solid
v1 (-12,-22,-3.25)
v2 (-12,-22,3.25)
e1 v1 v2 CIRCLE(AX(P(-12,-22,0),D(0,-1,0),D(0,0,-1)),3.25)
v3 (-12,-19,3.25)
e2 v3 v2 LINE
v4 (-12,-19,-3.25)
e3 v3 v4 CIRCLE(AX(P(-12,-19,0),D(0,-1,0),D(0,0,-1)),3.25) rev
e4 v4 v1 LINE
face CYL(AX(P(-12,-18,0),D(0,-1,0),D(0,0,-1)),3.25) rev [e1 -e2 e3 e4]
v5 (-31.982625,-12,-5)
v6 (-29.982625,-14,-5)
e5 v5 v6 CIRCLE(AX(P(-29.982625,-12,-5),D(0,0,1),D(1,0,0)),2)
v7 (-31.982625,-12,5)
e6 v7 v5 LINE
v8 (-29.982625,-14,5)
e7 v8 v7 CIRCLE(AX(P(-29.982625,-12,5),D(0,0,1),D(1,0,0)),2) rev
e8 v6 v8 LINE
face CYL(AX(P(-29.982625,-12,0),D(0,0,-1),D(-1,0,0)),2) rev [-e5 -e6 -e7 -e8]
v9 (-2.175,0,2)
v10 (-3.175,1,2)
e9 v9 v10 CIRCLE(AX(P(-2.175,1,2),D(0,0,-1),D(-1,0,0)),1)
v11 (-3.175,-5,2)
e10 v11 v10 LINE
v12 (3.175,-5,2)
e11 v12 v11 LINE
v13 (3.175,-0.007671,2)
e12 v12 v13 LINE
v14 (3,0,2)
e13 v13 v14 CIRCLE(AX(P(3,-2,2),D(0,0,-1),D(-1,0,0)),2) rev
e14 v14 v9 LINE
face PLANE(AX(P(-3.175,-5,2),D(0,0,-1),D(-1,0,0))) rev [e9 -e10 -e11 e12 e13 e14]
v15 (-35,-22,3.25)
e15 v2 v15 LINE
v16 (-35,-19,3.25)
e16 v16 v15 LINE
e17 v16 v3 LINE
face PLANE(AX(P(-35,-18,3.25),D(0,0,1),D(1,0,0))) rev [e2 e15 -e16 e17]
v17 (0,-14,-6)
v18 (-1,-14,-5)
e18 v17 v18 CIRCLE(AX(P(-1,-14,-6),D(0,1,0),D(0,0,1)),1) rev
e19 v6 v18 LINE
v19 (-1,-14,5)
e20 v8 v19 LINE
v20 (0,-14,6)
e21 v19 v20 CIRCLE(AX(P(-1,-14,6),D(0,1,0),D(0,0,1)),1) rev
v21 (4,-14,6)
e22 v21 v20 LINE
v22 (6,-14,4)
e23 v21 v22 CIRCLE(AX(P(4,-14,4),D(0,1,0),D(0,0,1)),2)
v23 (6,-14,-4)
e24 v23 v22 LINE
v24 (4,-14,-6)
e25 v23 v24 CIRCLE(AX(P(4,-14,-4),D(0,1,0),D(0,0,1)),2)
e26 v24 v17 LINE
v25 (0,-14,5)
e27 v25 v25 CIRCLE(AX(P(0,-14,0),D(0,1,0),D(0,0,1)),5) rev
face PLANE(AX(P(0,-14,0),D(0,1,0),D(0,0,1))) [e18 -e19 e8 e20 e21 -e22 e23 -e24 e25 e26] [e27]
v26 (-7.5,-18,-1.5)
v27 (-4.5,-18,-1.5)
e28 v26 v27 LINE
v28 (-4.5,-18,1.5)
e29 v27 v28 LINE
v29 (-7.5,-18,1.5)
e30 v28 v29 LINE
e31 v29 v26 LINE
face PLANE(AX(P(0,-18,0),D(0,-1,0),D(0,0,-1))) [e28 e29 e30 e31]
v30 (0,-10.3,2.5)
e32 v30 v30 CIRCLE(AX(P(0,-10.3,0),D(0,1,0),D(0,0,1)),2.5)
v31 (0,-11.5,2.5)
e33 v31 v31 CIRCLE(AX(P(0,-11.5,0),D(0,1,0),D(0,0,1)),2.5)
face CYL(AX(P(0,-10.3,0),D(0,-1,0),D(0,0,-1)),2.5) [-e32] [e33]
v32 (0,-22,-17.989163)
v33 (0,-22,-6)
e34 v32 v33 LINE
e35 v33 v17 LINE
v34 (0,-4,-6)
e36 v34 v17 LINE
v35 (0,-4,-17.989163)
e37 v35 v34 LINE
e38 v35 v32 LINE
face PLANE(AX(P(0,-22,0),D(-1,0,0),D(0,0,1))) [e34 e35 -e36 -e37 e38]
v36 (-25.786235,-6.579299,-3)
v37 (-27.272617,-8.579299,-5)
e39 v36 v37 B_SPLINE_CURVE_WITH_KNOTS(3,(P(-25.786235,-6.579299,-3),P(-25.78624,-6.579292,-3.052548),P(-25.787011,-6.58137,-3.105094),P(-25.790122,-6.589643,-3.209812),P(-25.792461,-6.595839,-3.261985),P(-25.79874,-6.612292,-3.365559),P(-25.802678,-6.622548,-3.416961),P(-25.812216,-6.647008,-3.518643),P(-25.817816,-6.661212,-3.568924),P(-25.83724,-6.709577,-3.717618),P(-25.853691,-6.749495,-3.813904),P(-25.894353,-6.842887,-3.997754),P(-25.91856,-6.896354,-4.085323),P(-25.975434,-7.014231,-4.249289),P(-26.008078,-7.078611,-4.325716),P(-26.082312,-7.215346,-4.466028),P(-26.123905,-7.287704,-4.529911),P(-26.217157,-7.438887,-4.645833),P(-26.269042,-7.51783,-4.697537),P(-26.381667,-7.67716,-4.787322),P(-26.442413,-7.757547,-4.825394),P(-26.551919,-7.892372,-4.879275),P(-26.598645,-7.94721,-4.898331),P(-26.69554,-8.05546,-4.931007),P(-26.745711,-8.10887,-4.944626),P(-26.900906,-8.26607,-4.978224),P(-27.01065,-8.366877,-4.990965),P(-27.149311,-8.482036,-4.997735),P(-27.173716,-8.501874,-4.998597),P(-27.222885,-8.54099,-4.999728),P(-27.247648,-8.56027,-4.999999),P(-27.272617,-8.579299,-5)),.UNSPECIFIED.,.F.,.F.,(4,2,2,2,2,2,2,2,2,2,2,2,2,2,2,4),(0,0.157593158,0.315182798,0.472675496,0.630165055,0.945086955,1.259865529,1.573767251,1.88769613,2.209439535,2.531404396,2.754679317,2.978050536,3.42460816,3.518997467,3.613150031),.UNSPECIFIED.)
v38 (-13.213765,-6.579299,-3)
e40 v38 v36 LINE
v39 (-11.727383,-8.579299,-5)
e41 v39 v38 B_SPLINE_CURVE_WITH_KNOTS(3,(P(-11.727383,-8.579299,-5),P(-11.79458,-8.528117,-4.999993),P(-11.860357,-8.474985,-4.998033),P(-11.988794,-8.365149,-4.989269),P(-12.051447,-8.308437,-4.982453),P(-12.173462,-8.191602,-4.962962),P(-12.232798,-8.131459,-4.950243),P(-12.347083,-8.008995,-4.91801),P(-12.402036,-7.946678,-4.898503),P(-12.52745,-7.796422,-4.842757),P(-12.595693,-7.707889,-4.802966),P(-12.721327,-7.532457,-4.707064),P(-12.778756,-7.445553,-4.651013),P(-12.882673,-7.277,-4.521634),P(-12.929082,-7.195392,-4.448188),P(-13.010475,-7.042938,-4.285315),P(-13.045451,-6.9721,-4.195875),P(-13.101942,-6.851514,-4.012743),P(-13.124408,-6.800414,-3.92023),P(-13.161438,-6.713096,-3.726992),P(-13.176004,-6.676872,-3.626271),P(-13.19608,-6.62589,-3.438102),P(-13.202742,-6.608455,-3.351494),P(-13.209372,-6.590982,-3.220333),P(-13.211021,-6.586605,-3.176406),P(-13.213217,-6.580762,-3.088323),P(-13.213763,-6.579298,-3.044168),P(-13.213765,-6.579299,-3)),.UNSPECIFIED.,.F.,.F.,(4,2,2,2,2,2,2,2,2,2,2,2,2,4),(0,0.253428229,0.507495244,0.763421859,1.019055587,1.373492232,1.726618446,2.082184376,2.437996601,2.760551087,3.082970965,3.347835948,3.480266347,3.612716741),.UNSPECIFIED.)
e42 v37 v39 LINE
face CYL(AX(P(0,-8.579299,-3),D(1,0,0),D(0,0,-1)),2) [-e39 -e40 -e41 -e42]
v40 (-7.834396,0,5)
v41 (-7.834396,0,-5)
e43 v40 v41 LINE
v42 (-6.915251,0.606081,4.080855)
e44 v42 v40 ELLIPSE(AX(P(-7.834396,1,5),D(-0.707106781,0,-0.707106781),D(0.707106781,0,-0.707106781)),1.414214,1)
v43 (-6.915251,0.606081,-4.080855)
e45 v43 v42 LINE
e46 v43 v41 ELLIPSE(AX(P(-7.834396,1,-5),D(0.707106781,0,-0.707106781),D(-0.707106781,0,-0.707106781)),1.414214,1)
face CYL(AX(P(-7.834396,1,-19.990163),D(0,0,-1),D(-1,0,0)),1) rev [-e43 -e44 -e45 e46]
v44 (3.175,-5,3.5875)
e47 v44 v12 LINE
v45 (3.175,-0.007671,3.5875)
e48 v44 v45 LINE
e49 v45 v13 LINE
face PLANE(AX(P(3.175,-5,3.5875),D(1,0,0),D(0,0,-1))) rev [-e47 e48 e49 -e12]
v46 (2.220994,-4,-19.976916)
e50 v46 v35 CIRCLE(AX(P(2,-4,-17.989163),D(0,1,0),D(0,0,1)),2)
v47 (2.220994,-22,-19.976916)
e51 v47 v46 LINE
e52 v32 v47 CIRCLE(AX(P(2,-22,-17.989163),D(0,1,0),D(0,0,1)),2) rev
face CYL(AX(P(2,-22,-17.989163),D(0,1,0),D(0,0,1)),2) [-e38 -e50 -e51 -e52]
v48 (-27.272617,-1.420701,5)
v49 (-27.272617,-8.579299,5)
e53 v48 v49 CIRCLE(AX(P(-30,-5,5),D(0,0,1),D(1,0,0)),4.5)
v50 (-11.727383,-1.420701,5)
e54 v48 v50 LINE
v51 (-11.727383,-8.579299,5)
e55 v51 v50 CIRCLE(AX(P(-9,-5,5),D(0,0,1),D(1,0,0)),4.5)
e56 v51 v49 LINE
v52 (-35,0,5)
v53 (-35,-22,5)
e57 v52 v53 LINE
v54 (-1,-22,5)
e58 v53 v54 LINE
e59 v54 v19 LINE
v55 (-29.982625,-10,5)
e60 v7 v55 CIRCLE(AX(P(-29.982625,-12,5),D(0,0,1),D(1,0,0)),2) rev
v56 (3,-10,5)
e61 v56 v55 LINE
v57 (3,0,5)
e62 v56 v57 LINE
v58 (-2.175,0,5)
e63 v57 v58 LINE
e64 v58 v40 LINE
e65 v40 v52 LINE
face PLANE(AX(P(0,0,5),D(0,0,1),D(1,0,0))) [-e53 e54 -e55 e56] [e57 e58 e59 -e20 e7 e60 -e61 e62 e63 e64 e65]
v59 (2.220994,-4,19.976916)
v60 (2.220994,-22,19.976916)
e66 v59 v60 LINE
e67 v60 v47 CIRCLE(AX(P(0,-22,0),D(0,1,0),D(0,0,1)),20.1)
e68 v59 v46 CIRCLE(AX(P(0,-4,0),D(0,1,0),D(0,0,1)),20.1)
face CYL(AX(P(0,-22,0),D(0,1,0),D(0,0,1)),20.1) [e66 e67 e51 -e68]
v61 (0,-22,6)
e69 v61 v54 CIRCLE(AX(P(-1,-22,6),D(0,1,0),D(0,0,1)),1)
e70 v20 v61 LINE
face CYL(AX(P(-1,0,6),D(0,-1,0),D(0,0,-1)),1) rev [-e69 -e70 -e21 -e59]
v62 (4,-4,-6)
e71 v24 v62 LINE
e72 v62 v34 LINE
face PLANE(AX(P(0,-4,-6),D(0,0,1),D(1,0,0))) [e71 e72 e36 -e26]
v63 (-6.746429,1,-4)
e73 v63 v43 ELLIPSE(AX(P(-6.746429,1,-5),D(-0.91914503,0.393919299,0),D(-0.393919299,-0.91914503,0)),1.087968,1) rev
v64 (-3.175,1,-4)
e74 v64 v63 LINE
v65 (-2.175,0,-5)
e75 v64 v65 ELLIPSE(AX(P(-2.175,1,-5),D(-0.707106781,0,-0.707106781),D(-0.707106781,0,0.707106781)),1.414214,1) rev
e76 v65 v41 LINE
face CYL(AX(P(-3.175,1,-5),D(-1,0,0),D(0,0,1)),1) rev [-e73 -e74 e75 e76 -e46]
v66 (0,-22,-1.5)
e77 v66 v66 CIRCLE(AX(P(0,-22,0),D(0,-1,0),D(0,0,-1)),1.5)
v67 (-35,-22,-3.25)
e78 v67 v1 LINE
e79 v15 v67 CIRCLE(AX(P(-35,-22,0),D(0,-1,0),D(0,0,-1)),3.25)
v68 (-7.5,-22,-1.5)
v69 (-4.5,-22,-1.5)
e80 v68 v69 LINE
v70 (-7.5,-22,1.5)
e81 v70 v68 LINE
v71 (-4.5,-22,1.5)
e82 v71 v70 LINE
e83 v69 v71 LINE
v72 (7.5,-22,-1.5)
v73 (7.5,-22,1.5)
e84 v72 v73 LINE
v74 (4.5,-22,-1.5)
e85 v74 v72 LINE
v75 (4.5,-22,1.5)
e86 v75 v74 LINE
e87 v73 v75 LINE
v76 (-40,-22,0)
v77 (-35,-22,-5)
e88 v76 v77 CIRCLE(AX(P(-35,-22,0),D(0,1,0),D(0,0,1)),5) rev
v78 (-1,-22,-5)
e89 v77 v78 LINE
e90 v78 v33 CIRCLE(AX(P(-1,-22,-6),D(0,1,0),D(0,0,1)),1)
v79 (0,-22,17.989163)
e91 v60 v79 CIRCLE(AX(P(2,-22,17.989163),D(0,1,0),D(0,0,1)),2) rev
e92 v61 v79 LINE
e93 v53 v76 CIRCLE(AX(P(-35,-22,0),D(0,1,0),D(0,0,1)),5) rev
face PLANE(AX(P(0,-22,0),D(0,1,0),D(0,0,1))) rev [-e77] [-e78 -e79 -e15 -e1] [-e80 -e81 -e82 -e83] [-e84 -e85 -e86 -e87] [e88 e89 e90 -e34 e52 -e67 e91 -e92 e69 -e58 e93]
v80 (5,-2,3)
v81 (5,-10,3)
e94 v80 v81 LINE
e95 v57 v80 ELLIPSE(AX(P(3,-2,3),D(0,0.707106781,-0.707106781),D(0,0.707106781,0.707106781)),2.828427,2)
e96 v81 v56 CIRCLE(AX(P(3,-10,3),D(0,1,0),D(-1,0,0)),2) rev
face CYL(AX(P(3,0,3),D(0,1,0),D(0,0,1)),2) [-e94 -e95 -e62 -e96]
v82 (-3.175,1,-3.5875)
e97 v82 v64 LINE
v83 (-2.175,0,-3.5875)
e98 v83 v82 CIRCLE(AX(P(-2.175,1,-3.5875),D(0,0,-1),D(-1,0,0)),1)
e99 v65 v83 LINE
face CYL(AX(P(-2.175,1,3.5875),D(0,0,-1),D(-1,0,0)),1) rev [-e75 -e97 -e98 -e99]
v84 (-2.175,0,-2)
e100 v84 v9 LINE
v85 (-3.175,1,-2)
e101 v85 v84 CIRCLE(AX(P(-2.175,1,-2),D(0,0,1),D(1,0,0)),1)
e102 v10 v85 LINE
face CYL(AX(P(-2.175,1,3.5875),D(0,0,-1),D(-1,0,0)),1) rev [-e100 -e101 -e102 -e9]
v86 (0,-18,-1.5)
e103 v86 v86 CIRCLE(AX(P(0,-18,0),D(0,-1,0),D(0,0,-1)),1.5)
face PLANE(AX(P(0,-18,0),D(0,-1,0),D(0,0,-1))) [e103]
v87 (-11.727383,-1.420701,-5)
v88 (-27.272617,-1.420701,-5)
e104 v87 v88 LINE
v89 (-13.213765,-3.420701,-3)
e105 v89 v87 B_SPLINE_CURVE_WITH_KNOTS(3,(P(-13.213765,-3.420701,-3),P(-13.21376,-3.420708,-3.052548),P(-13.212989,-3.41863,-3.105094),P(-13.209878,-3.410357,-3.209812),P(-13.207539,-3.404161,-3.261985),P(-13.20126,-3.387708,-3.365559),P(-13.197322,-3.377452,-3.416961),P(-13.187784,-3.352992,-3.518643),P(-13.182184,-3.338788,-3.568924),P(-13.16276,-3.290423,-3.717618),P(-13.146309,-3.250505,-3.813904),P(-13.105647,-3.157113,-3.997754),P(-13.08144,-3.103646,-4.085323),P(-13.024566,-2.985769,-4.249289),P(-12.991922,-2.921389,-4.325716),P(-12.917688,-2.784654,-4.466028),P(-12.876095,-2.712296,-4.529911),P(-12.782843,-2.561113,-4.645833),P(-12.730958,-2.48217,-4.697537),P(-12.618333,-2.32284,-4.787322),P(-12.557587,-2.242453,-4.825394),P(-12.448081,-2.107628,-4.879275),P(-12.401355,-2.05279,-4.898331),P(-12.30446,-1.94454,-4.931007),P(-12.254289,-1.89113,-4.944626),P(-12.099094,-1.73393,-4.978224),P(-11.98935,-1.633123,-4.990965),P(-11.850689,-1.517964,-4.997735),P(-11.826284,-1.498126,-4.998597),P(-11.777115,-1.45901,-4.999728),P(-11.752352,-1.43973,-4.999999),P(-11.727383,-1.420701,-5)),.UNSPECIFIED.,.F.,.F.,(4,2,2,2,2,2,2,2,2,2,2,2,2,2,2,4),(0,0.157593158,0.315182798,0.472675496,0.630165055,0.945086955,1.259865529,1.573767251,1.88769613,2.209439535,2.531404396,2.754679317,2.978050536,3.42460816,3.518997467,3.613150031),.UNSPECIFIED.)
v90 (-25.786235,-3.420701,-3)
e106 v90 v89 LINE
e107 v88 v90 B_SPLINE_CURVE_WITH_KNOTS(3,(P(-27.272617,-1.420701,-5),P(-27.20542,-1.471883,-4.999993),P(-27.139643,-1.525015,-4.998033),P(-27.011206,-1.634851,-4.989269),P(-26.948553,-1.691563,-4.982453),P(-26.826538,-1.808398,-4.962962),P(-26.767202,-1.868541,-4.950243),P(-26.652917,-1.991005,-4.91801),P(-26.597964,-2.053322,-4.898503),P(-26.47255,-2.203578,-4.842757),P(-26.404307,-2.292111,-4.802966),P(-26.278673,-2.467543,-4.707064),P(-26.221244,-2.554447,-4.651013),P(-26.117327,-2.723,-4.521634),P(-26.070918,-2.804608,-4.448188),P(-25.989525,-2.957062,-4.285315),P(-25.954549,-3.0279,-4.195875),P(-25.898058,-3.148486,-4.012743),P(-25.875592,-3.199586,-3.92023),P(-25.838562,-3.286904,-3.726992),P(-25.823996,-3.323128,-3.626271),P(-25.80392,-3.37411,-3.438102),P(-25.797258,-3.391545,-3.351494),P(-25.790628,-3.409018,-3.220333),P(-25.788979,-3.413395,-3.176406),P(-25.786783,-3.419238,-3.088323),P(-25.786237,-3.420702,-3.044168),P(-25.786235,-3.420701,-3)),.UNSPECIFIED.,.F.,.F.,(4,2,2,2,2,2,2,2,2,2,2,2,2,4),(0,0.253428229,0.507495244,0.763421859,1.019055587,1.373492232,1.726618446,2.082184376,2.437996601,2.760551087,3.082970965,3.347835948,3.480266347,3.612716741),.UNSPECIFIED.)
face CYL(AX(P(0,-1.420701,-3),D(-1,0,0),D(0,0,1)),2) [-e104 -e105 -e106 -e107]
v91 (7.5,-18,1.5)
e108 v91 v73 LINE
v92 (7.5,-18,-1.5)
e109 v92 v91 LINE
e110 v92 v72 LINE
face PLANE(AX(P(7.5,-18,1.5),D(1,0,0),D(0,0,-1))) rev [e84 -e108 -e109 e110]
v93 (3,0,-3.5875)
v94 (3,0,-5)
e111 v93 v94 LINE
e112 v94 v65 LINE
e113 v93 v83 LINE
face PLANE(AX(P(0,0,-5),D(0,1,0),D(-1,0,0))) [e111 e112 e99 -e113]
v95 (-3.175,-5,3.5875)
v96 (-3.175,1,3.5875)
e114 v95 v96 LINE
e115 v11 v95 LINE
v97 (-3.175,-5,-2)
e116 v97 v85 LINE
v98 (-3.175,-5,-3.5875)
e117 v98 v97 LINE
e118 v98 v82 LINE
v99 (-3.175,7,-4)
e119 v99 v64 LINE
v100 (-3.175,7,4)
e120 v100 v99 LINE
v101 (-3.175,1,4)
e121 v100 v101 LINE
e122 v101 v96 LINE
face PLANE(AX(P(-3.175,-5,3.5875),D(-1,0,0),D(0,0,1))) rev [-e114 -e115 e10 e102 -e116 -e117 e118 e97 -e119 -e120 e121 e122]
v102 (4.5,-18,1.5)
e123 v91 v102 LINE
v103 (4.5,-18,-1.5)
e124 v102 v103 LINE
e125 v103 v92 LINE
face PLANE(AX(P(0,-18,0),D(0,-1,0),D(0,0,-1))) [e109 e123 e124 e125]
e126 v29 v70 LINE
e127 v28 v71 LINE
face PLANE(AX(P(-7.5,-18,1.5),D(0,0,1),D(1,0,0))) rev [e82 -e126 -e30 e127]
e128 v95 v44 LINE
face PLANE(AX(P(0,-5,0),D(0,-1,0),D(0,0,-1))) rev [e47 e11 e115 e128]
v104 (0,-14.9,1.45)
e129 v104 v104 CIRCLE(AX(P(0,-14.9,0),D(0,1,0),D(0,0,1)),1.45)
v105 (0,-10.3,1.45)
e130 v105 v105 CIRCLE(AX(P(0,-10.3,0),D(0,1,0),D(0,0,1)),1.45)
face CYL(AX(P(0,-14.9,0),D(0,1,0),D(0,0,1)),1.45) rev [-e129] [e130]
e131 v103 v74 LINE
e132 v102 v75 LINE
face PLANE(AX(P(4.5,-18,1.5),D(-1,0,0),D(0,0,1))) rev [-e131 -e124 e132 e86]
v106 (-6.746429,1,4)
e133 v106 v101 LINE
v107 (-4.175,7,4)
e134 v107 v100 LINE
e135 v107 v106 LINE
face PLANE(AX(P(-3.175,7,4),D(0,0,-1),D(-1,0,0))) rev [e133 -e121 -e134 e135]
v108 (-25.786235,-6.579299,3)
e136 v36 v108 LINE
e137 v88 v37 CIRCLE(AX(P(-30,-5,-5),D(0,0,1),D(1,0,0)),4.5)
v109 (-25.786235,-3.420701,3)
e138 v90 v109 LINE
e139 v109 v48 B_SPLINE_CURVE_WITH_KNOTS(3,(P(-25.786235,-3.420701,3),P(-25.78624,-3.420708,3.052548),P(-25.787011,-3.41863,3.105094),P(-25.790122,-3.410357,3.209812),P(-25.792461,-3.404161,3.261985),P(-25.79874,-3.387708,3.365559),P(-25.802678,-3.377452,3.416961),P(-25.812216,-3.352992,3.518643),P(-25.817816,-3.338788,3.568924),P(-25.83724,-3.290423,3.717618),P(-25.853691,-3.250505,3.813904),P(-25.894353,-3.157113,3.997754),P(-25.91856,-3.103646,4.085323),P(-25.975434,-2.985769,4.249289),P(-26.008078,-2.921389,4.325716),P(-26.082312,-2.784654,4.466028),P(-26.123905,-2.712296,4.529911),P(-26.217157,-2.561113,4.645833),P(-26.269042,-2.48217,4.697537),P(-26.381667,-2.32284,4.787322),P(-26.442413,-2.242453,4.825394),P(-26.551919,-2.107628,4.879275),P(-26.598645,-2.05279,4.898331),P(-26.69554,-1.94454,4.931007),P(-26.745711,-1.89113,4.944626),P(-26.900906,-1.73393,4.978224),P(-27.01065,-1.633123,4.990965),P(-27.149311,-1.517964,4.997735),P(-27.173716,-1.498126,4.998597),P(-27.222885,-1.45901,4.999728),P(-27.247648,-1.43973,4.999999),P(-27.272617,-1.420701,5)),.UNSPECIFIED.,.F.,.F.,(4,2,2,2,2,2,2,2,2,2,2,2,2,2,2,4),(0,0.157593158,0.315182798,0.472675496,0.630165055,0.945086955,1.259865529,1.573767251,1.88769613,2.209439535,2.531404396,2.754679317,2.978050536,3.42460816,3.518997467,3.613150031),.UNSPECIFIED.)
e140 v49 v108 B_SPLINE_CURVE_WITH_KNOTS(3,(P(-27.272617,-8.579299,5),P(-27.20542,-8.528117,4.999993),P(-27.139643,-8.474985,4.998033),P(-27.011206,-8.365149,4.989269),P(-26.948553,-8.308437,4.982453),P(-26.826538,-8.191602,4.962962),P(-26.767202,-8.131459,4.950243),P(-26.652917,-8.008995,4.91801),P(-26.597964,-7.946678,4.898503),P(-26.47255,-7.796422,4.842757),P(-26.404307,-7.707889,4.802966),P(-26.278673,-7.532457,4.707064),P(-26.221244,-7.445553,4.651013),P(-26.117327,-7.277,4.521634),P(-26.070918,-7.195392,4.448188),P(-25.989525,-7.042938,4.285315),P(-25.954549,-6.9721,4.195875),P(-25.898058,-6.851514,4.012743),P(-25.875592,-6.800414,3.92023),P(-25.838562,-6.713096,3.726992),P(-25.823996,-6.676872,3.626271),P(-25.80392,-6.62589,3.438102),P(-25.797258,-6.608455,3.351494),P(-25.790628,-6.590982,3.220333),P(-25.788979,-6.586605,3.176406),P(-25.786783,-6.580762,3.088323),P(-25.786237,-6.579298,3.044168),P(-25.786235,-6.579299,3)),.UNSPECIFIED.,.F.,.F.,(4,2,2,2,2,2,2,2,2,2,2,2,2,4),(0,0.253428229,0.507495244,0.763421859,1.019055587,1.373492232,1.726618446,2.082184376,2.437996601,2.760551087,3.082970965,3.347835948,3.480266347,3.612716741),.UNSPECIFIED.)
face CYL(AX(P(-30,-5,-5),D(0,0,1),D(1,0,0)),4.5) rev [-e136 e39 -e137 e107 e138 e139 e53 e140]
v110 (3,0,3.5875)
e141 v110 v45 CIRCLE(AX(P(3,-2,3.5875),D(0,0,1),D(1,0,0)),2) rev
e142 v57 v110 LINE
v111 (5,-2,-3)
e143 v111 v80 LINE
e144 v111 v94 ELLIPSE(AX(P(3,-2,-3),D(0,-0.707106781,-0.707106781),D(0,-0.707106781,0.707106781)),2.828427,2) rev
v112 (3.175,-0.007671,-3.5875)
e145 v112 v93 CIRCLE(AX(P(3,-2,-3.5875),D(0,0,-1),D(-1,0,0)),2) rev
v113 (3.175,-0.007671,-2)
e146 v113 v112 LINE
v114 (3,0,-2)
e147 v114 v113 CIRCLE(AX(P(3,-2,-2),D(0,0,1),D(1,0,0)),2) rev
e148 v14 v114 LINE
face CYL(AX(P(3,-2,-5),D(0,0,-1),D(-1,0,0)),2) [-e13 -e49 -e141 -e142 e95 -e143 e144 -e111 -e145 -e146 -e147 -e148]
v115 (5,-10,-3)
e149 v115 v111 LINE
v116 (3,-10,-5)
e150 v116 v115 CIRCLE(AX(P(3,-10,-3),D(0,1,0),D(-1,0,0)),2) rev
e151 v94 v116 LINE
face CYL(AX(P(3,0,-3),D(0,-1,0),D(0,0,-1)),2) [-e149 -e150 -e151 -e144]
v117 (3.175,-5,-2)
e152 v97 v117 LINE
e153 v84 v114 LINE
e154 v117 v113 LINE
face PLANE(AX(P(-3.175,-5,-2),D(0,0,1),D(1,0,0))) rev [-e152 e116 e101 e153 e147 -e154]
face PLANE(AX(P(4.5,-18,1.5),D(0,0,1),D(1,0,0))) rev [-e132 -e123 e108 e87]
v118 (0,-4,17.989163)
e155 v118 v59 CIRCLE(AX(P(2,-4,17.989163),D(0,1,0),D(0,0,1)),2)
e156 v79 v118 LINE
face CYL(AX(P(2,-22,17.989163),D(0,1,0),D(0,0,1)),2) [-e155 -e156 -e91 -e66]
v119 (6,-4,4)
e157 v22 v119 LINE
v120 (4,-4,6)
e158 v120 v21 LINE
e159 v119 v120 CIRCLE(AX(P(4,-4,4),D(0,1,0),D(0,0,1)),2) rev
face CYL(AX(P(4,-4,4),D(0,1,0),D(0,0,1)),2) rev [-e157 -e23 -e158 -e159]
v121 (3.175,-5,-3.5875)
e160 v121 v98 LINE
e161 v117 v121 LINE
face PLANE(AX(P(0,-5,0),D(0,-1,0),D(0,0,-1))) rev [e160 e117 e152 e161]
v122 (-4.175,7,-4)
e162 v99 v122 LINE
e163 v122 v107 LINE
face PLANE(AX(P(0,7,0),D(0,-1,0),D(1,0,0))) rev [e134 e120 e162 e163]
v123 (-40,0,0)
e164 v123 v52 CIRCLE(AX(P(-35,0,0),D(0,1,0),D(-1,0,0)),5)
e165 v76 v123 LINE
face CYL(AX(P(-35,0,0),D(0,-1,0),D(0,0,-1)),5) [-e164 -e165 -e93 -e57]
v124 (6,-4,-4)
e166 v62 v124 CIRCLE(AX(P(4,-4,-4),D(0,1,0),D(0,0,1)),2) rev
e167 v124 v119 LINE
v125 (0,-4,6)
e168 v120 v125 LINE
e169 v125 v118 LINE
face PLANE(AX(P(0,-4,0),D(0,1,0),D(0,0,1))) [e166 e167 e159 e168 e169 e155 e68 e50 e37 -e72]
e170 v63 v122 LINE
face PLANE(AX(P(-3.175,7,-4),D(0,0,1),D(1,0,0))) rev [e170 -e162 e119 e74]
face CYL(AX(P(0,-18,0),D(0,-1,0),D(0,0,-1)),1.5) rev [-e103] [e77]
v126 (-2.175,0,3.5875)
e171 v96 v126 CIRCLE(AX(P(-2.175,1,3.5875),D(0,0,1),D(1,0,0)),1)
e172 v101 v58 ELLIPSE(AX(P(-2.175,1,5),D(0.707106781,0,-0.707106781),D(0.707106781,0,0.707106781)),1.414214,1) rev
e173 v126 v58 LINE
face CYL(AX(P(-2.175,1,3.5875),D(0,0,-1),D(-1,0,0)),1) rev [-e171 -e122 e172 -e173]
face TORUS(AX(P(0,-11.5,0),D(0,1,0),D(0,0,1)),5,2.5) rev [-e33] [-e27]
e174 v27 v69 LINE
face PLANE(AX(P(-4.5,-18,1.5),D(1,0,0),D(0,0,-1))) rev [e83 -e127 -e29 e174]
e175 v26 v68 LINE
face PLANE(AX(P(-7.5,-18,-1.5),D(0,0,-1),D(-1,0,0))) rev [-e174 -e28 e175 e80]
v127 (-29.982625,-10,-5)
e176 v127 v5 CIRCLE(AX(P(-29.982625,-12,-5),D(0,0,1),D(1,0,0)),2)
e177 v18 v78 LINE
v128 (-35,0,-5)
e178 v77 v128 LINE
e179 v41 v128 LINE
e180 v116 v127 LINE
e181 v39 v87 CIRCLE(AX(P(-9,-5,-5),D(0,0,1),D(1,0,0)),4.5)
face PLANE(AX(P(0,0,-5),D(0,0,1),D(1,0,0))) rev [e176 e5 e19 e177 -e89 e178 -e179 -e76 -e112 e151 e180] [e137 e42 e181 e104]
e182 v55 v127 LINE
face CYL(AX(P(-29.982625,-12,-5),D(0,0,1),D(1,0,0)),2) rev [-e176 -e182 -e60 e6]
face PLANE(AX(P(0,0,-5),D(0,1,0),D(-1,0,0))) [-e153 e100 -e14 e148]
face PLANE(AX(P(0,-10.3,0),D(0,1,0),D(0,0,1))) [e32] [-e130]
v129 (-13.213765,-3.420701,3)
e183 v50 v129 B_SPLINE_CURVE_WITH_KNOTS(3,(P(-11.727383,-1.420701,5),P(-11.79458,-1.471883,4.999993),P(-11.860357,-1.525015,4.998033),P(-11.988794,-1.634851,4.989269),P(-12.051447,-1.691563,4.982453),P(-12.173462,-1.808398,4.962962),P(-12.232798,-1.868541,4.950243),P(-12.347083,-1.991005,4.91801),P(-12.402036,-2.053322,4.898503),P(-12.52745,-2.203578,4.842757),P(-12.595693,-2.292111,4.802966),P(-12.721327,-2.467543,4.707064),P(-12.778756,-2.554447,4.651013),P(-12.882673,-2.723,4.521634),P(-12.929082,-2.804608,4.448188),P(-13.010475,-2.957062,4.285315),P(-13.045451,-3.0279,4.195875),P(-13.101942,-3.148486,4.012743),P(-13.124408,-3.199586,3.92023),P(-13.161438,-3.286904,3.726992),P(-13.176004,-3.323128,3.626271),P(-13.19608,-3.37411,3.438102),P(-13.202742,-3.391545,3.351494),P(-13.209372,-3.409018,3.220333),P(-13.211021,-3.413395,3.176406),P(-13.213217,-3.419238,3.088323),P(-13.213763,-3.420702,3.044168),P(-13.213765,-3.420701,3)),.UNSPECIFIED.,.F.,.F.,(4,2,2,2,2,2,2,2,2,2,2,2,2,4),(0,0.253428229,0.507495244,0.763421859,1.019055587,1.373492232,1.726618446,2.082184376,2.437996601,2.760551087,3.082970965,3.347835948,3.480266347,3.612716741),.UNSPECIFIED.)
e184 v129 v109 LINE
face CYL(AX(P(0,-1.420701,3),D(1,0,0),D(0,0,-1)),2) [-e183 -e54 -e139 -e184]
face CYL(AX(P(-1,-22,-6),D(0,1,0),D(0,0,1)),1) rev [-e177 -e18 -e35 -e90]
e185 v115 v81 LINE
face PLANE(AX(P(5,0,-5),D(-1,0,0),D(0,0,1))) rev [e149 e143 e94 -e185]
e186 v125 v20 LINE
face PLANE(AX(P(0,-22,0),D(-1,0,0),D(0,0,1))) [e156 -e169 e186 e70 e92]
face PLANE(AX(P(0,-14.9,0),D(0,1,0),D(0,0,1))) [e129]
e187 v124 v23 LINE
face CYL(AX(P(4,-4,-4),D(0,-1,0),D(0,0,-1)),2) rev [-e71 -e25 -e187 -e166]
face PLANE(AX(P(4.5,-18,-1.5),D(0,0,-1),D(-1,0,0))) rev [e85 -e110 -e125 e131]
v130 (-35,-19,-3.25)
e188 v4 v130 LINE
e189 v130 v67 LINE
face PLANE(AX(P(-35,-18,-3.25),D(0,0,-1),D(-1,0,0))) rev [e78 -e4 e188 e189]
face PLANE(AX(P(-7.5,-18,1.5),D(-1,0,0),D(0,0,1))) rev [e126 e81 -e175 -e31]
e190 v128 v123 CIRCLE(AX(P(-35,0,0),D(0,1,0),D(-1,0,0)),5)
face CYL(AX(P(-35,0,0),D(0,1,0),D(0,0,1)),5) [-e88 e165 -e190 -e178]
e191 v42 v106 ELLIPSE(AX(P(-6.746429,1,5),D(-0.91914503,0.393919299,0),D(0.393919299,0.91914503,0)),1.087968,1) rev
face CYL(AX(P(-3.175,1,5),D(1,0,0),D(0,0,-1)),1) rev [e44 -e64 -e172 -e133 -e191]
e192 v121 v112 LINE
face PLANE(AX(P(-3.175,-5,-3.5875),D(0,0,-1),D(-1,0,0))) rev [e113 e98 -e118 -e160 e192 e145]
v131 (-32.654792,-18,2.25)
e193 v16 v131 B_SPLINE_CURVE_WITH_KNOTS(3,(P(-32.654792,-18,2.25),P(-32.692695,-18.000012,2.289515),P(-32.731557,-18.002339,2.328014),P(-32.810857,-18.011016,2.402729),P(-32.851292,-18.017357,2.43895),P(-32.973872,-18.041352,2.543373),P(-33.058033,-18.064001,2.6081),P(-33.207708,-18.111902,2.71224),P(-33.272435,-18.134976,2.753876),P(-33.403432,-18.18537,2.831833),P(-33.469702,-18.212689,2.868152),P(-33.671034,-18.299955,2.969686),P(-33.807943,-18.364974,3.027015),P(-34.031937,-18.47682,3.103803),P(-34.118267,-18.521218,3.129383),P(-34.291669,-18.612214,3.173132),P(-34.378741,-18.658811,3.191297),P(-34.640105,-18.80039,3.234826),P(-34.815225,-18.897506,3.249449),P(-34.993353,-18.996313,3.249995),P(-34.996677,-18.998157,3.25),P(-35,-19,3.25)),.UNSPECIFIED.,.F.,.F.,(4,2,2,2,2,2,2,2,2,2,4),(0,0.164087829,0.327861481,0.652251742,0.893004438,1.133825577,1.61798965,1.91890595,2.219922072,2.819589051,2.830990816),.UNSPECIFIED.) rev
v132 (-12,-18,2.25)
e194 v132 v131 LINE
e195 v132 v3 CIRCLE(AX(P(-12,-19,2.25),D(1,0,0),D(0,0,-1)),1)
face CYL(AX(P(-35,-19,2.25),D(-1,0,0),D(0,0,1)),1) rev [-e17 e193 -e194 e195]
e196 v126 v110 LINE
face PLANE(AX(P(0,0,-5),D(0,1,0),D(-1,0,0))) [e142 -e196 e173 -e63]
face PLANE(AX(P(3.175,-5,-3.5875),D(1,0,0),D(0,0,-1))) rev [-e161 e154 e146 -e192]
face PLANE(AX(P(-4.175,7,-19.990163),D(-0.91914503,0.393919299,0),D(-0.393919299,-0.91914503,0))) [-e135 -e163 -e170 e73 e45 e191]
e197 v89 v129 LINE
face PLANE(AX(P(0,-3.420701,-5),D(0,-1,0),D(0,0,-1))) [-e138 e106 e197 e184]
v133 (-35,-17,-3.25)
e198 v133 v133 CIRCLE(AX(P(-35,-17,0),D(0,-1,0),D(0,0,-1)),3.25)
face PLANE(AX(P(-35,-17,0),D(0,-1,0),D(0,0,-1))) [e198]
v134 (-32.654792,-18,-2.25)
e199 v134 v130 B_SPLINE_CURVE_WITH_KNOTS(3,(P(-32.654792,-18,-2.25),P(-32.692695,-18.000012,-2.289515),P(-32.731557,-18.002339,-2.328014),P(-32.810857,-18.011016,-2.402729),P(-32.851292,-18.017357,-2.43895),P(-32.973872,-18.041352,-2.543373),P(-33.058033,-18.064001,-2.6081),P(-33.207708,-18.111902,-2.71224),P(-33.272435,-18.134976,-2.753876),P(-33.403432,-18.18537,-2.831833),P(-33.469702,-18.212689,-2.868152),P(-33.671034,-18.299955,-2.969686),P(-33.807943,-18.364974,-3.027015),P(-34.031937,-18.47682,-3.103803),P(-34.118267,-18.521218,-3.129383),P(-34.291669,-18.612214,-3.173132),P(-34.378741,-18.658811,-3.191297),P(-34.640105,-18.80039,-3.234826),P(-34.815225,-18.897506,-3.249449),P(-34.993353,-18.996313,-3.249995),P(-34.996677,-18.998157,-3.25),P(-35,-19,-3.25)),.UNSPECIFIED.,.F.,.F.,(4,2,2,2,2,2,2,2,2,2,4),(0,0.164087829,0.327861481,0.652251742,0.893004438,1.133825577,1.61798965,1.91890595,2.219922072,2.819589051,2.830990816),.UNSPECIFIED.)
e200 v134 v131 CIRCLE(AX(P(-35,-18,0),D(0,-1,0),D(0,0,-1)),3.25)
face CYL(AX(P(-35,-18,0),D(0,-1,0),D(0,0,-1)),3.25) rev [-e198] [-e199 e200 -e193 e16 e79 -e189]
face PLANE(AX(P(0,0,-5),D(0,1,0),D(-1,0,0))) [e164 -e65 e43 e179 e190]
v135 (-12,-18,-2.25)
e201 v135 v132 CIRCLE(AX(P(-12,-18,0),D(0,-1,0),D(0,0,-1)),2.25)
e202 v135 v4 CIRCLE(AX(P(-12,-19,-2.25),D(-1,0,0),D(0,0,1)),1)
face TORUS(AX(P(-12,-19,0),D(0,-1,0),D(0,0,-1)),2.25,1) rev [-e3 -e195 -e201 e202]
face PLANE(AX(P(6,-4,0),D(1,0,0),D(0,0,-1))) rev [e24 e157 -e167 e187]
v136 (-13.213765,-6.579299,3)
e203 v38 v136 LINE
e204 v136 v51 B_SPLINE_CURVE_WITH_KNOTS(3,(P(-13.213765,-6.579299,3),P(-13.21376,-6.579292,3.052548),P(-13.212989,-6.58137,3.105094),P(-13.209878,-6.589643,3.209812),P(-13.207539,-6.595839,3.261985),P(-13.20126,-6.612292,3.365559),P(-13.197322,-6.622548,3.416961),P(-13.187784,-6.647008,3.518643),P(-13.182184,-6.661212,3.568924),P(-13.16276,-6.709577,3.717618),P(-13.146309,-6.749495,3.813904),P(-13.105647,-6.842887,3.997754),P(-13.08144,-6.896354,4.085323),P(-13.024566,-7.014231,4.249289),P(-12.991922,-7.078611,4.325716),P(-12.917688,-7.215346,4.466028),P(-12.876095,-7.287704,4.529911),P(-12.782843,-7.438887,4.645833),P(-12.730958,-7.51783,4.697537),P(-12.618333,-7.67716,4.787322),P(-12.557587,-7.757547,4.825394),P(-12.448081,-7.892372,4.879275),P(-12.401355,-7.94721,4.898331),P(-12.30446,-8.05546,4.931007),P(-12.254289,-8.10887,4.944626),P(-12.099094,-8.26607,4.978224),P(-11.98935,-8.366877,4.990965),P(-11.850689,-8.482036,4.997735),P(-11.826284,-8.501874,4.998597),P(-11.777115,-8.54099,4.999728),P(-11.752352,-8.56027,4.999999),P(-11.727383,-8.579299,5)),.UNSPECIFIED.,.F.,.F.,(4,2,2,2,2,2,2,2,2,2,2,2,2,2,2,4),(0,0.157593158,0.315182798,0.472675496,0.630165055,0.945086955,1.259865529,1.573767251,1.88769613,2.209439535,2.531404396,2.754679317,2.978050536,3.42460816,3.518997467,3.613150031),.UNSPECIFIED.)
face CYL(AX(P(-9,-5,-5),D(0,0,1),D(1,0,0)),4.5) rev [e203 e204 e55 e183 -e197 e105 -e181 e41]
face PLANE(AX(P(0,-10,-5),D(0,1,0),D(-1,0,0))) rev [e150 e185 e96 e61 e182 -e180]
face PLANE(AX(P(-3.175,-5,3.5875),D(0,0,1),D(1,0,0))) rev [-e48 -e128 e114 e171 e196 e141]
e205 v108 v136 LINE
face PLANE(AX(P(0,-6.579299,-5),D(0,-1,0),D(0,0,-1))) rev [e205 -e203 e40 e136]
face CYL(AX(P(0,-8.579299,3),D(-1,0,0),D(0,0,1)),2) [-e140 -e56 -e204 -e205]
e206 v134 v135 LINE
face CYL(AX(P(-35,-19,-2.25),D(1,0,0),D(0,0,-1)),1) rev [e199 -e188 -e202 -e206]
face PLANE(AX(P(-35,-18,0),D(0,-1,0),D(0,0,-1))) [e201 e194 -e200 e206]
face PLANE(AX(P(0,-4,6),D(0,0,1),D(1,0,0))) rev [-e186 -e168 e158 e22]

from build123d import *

# Parameters (mm, degrees)
BOSS_EXTRUDE1_DEPTH      = 5
BOSS_EXTRUDE1_DEPTH_BACK = 5
SKETCH2_W                = 6.35
SKETCH2_H                = 1.5875
CUT_EXTRUDE1_DEPTH       = 5
BOSS_EXTRUDE2_START      = -14
SKETCH3_W                = 5.881583951
SKETCH3_H                = 10
BOSS_EXTRUDE2_DEPTH      = 8
BOSS_EXTRUDE3_START      = 10
BOSS_EXTRUDE3_DEPTH      = 10
FILLET2_R                = 5
FILLET6_R                = 2
FILLET3_R                = 2
SKETCH5_R                = 1.5
SKETCH5_W                = 3
SKETCH5_H                = 3
CUT_EXTRUDE2_DEPTH       = 4
FILLET4_R                = 1
SKETCH6_R                = 3.25
CUT_EXTRUDE3_DEPTH       = 5
BOSS_EXTRUDE4_START      = -14
SKETCH7_R                = 2.5
BOSS_EXTRUDE4_DEPTH      = 3.7
SKETCH9_R                = 1.45
CUT_EXTRUDE4_DEPTH       = 4.6
FILLET5_R                = 2.5
SKETCH10_W               = 4
SKETCH10_H               = 8
BOSS_EXTRUDE5_DEPTH      = 7
CUT_EXTRUDE5_REACH       = 53.57
FILLET7_R                = 1


# Some blends are built 0.0001 mm under size
with BuildPart() as part:
    # Sketch1 → Boss-Extrude1 (new, two sides: drawn at the far end of the back side and taken through both)
    with BuildSketch(Plane.XY.offset(-BOSS_EXTRUDE1_DEPTH_BACK)):
        Polygon((5, -10), (5, 0), (0, 0), (-5, 0), (-35, 0), (-40, 0), (-40, -14), (-31.982625312, -14), (-31.982625312, -10), (-5, -10), align=None)
        with BuildLine():
            ThreePointArc((-25.78623506, -6.579298906), (-34.5, -5), (-25.78623506, -3.420701094))
            Line((-25.78623506, -3.420701094), (-13.21376494, -3.420701094))
            ThreePointArc((-13.21376494, -3.420701094), (-8.197485897, -0.572136959), (-4.5, -5))
            ThreePointArc((-4.5, -5), (-8.197485897, -9.427863041), (-13.21376494, -6.579298906))
            Line((-13.21376494, -6.579298906), (-25.78623506, -6.579298906))
        make_face(mode=Mode.SUBTRACT)
    extrude(amount=BOSS_EXTRUDE1_DEPTH + BOSS_EXTRUDE1_DEPTH_BACK)

    # Sketch2 → Cut-Extrude1 (cut)
    with BuildSketch(Plane(origin=(0, 0, 0), x_dir=(1, 0, 0), z_dir=(0, 1, 0))):
        with Locations((0, -2.79375)):
            Rectangle(SKETCH2_W, SKETCH2_H)
        with Locations((0, 2.79375)):
            Rectangle(SKETCH2_W, SKETCH2_H)
    extrude(amount=-CUT_EXTRUDE1_DEPTH, mode=Mode.SUBTRACT)

    # Sketch3 → Boss-Extrude2 (add)
    with BuildSketch(Plane(origin=(0, 0, 0), x_dir=(1, 0, 0), z_dir=(0, 1, 0)).offset(BOSS_EXTRUDE2_START)):
        with BuildLine():
            Line((0, 20.1), (0, 5))
            Line((0, 5), (5.881583951, 5))
            Line((5.881583951, 5), (5.881583951, -5))
            Line((5.881583951, -5), (0, -5))
            Line((0, -5), (0, -20.1))
            ThreePointArc((0, -20.1), (14.212846302, -14.212846302), (20.1, 0))
            ThreePointArc((20.1, 0), (14.212846302, 14.212846302), (0, 20.1))
        make_face()
        with Locations((2.940791976, 0)):
            Rectangle(SKETCH3_W, SKETCH3_H)
        with BuildLine():
            Line((0, 5), (-19.468179165, 5))
            ThreePointArc((-19.468179165, 5), (-20.1, 0), (-19.468179165, -5))
            Line((-19.468179165, -5), (0, -5))
            Line((0, -5), (0, 5))
        make_face()
        with BuildLine():
            Line((-19.468179165, 5), (-40, 5))
            Line((-40, 5), (-40, -5))
            Line((-40, -5), (-19.468179165, -5))
            ThreePointArc((-19.468179165, -5), (-20.1, 0), (-19.468179165, 5))
        make_face()
    extrude(amount=-BOSS_EXTRUDE2_DEPTH)

    # Sketch4 → Boss-Extrude3 (add)
    with BuildSketch(Plane(origin=(0, -14, 0), x_dir=(1, 0, 0), z_dir=(0, 1, 0)).offset(BOSS_EXTRUDE3_START)):
        with BuildLine():
            ThreePointArc((20.1, 0), (14.212846302, 14.212846302), (0, 20.1))
            Line((0, 20.1), (0, 6))
            Line((0, 6), (6, 6))
            Line((6, 6), (6, -6))
            Line((6, -6), (0, -6))
            Line((0, -6), (0, -20.1))
            ThreePointArc((0, -20.1), (14.212846302, -14.212846302), (20.1, 0))
        make_face()
    extrude(amount=-BOSS_EXTRUDE3_DEPTH)

    # Fillet2
    fillet2_edges = [part.edges().sort_by_distance(p)[0] for p in [
        (-40, -11, -5),
        (-40, -11, 5),
    ]]
    fillet(fillet2_edges, radius=FILLET2_R - 0.0001)  # a hair under: the kernel refuses the full size

    # Fillet6
    # the kernel refuses this fillet: 2 mm, written as the material it adds along each edge
    with BuildSketch(Plane(origin=(6, -4, -6), x_dir=(-1, 0, 0), z_dir=(0, -1, 0))) as fillet6_piece_1:
        with BuildLine():
            CenterArc((FILLET6_R, -FILLET6_R), FILLET6_R, 90, 90)
            Line((0, -FILLET6_R), (0, 0))
            Line((0, 0), (FILLET6_R, 0))
        make_face()
    extrude(amount=15)
    with BuildSketch(Plane(origin=(6, -4, 6), x_dir=(-1, 0, 0), z_dir=(0, -1, 0))) as fillet6_piece_2:
        with BuildLine():
            CenterArc((FILLET6_R, FILLET6_R), FILLET6_R, 180, 90)
            Line((0, FILLET6_R), (0, 0))
            Line((0, 0), (FILLET6_R, 0))
        make_face()
    extrude(amount=15)
    # the kernel refuses this fillet: 2 mm, written as the material it takes off along each edge
    with BuildSketch(Plane(origin=(5, -15, -5), x_dir=(0, 0, 1), z_dir=(0, 1, 0))) as fillet6_2_piece_1_section:
        with BuildLine():
            CenterArc((FILLET6_R, -FILLET6_R), FILLET6_R, 90, 90)
            Line((0, -FILLET6_R), (0, 0))
            Line((0, 0), (FILLET6_R, 0))
        make_face()
    fillet6_2_piece_1 = extrude(amount=20, mode=Mode.PRIVATE)
    fillet6_2_piece_1 = split(fillet6_2_piece_1, bisect_by=Plane(origin=(4.553264122, -14, -4.553264122), z_dir=(0, 1, 0)), keep=Keep.TOP, mode=Mode.PRIVATE)
    add(fillet6_2_piece_1, mode=Mode.SUBTRACT)
    with BuildSketch(Plane(origin=(5, -15, 5), x_dir=(-1, 0, 0), z_dir=(0, 1, 0))) as fillet6_2_piece_2_section:
        with BuildLine():
            CenterArc((FILLET6_R, -FILLET6_R), FILLET6_R, 90, 90)
            Line((0, -FILLET6_R), (0, 0))
            Line((0, 0), (FILLET6_R, 0))
        make_face()
    fillet6_2_piece_2 = extrude(amount=20, mode=Mode.PRIVATE)
    fillet6_2_piece_2 = split(fillet6_2_piece_2, bisect_by=Plane(origin=(4.553264122, -14, 4.553264122), z_dir=(0, 1, 0)), keep=Keep.TOP, mode=Mode.PRIVATE)
    add(fillet6_2_piece_2, mode=Mode.SUBTRACT)
    with BuildSketch(Plane(origin=(5, 0, -10), x_dir=(-1, 0, 0), z_dir=(0, 0, 1))) as fillet6_2_piece_3:
        with BuildLine():
            CenterArc((FILLET6_R, FILLET6_R), FILLET6_R, 180, 90)
            Line((0, FILLET6_R), (0, 0))
            Line((0, 0), (FILLET6_R, 0))
        make_face()
    extrude(amount=20, mode=Mode.SUBTRACT)

    # Fillet3
    fillet3_edges = [part.edges().sort_by_distance(p)[0] for p in [
        (-19.5, -3.420701094, -5),
        (-19.5, -6.579298906, -5),
        (-19.5, -6.579298906, 5),
        (-19.5, -3.420701094, 5),
        (-31.982625312, -10, 0),
        (-31.982625312, -14, 0),
        (0, -13, -20.1),
        (0, -13, 20.1),
    ]]
    fillet(fillet3_edges, radius=FILLET3_R - 0.0001)  # a hair under: the kernel refuses the full size

    # Sketch5 → Cut-Extrude2 (cut)
    with BuildSketch(Plane.XZ.offset(22)):
        with Locations(Location((0, 0, 0), (0, 0, 270))):
            Circle(SKETCH5_R)
        with BuildLine():
            Line((-35, 3.25), (-12, 3.25))
            ThreePointArc((-12, 3.25), (-8.75, 0), (-12, -3.25))
            Line((-12, -3.25), (-35, -3.25))
            ThreePointArc((-35, -3.25), (-38.25, 0), (-35, 3.25))
        make_face()
        with Locations((-6, 0)):
            Rectangle(SKETCH5_W, SKETCH5_H)
        with Locations((6, 0)):
            Rectangle(SKETCH5_W, SKETCH5_H)
    extrude(amount=-CUT_EXTRUDE2_DEPTH, mode=Mode.SUBTRACT)

    # Fillet4
    fillet4_edges = [part.edges().sort_by_distance(p)[0] for p in [
        (-23.5, -18, 3.25),
        (-8.75, -18, 0),
        (-23.5, -18, -3.25),
        (-38.25, -18, 0),
        (0, -18, -5),
        (0, -18, 5),
    ]]
    fillet(fillet4_edges, radius=FILLET4_R)

    # Sketch6 → Cut-Extrude3 (cut)
    with BuildSketch(Plane.XZ.offset(22)):
        with Locations(Location((-35, 0, 0), (0, 0, 270))):
            Circle(SKETCH6_R)
    extrude(amount=-CUT_EXTRUDE3_DEPTH, mode=Mode.SUBTRACT)

    # Sketch7 → Boss-Extrude4 (add)
    with BuildSketch(Plane(origin=(0, 0, 0), x_dir=(1, 0, 0), z_dir=(0, 1, 0)).offset(BOSS_EXTRUDE4_START)):
        with Locations(Location((0, 0, 0), (0, 0, 270))):
            Circle(SKETCH7_R)
    extrude(amount=BOSS_EXTRUDE4_DEPTH)

    # Sketch9 → Cut-Extrude4 (cut)
    with BuildSketch(Plane(origin=(0, -10.3, 0), x_dir=(1, 0, 0), z_dir=(0, 1, 0))):
        with Locations(Location((0, 0, 0), (0, 0, 270))):
            Circle(SKETCH9_R)
    extrude(amount=-CUT_EXTRUDE4_DEPTH, mode=Mode.SUBTRACT)

    # Fillet5
    fillet5_edges = [part.edges().sort_by_distance(p)[0] for p in [
        (0, -14, -2.5),
    ]]
    fillet(fillet5_edges, radius=FILLET5_R)

    # Sketch10 → Boss-Extrude5 (add)
    with BuildSketch(Plane(origin=(0, 0, 0), x_dir=(1, 0, 0), z_dir=(0, 1, 0))):
        with Locations((-5.175, 0)):
            Rectangle(SKETCH10_W, SKETCH10_H)
    extrude(amount=BOSS_EXTRUDE5_DEPTH)

    # Sketch11 → Cut-Extrude5 (cut, up to next)
    with BuildSketch(Plane.XY.offset(4), mode=Mode.PRIVATE) as cut_extrude5_sk1:
        Polygon((-7.175, 0), (-7.175, 7), (-4.175, 7), align=None)
    cut_extrude5_tool1 = extrude(cut_extrude5_sk1.sketch, amount=-CUT_EXTRUDE5_REACH, mode=Mode.PRIVATE) & part.part
    add(cut_extrude5_tool1.solids().sort_by_distance((-6.175, 4.666667, 4))[0], mode=Mode.SUBTRACT)

    # Fillet7
    # the kernel refuses this fillet: 1 mm, written as the material it adds along each edge
    with BuildSketch(Plane(origin=(-3.175, 0, 4), x_dir=(1, 0, 0), z_dir=(0, 0, -1)), Plane(origin=(-3.175, 0, -3.5875), x_dir=(1, 0, 0), z_dir=(0, 0, -1))) as fillet7_piece_1:
        with BuildLine():
            CenterArc((FILLET7_R, -FILLET7_R), FILLET7_R, 90, 90)
            Line((0, -FILLET7_R), (0, 0))
            Line((0, 0), (FILLET7_R, 0))
        make_face()
    extrude(amount=0.4125)
    with BuildSketch(Plane(origin=(-3.175, 0, 4), x_dir=(1, 0, 0), z_dir=(0, 0, -1))) as fillet7_piece_2_section:
        with BuildLine():
            CenterArc((FILLET7_R, -FILLET7_R), FILLET7_R, 90, 90)
            Line((0, -FILLET7_R), (0, 0))
            Line((0, 0), (FILLET7_R, 0))
        make_face()
    fillet7_piece_2 = extrude(amount=2.9125, mode=Mode.PRIVATE)
    fillet7_piece_2 = split(fillet7_piece_2, bisect_by=Plane(origin=(-2.948604886, 0.226395114, 2), z_dir=(0, 0, -1)), keep=Keep.TOP, mode=Mode.PRIVATE)
    add(fillet7_piece_2)
    with BuildSketch(Plane(origin=(-3.175, 0, 4.5), x_dir=(0, 1, 0), z_dir=(0, 0, -1))) as fillet7_piece_3_section:
        with BuildLine():
            CenterArc((FILLET7_R, FILLET7_R), FILLET7_R, 180, 90)
            Line((0, FILLET7_R), (0, 0))
            Line((0, 0), (FILLET7_R, 0))
        make_face()
    fillet7_piece_3 = extrude(amount=6.5, mode=Mode.PRIVATE)
    fillet7_piece_3 = split(fillet7_piece_3, bisect_by=Plane(origin=(-2.948604886, 0.226395114, 3.5875), z_dir=(0, 0, 1)), keep=Keep.TOP, mode=Mode.PRIVATE)
    fillet7_piece_3 = split(fillet7_piece_3, bisect_by=Plane(origin=(-2.948604886, 0.226395114, 4), z_dir=(0, 0, -1)), keep=Keep.TOP, mode=Mode.PRIVATE)
    add(fillet7_piece_3)
    with BuildSketch(Plane(origin=(-3.175, 0, 2), x_dir=(0, 1, 0), z_dir=(0, 0, -1))) as fillet7_piece_4:
        with BuildLine():
            CenterArc((FILLET7_R, FILLET7_R), FILLET7_R, 180, 90)
            Line((0, FILLET7_R), (0, 0))
            Line((0, 0), (FILLET7_R, 0))
        make_face()
    extrude(amount=4)
    with BuildSketch(Plane(origin=(-3.175, 0, 2), x_dir=(0, 1, 0), z_dir=(0, 0, -1))) as fillet7_piece_5_section:
        with BuildLine():
            CenterArc((FILLET7_R, FILLET7_R), FILLET7_R, 180, 90)
            Line((0, FILLET7_R), (0, 0))
            Line((0, 0), (FILLET7_R, 0))
        make_face()
    fillet7_piece_5 = extrude(amount=6.5, mode=Mode.PRIVATE)
    fillet7_piece_5 = split(fillet7_piece_5, bisect_by=Plane(origin=(-2.948604886, 0.226395114, -3.5875), z_dir=(0, 0, -1)), keep=Keep.TOP, mode=Mode.PRIVATE)
    fillet7_piece_5 = split(fillet7_piece_5, bisect_by=Plane(origin=(-2.948604886, 0.226395114, -4), z_dir=(0, 0, 1)), keep=Keep.TOP, mode=Mode.PRIVATE)
    add(fillet7_piece_5)
    with BuildSketch(Plane(origin=(-3.175, 0, -1.0875), x_dir=(1, 0, 0), z_dir=(0, 0, -1))) as fillet7_piece_6_section:
        with BuildLine():
            CenterArc((FILLET7_R, -FILLET7_R), FILLET7_R, 90, 90)
            Line((0, -FILLET7_R), (0, 0))
            Line((0, 0), (FILLET7_R, 0))
        make_face()
    fillet7_piece_6 = extrude(amount=2.9125, mode=Mode.PRIVATE)
    fillet7_piece_6 = split(fillet7_piece_6, bisect_by=Plane(origin=(-2.948604886, 0.226395114, -2), z_dir=(0, 0, 1)), keep=Keep.TOP, mode=Mode.PRIVATE)
    add(fillet7_piece_6)
    with BuildSketch(Plane(origin=(-3.175, 0, -4), x_dir=(0, 0, -1), z_dir=(-1, 0, 0))) as fillet7_piece_7_section:
        with BuildLine():
            CenterArc((FILLET7_R, -FILLET7_R), FILLET7_R, 90, 90)
            Line((0, -FILLET7_R), (0, 0))
            Line((0, 0), (FILLET7_R, 0))
        make_face()
    fillet7_piece_7 = extrude(amount=6.5, mode=Mode.PRIVATE)
    fillet7_piece_7 = split(fillet7_piece_7, bisect_by=Plane(origin=(-6.777174101, 0.928260431, -4.229410037), z_dir=(0.9191450300180579, -0.3939192985791677, 0)), keep=Keep.TOP, mode=Mode.PRIVATE)
    add(fillet7_piece_7)
    with BuildSketch(Plane(origin=(-7.175, 0, -4), x_dir=(-1, 0, 0), z_dir=(0, 0, 1))) as fillet7_piece_8:
        with BuildLine():
            CenterArc((FILLET7_R * 0.659396157981, -FILLET7_R), FILLET7_R, 90, 66.801409486)
            Line((-FILLET7_R * 0.259748872037, -FILLET7_R * 0.606080701421), (0, 0))
            Line((0, 0), (FILLET7_R * 0.659396157981, 0))
        make_face()
    extrude(amount=8)
    with BuildSketch(Plane(origin=(-9.675, 0, 4), x_dir=(0, 0, 1), z_dir=(1, 0, 0))) as fillet7_piece_9_section:
        with BuildLine():
            CenterArc((FILLET7_R, -FILLET7_R), FILLET7_R, 90, 90)
            Line((0, -FILLET7_R), (0, 0))
            Line((0, 0), (FILLET7_R, 0))
        make_face()
    fillet7_piece_9 = extrude(amount=6.5, mode=Mode.PRIVATE)
    fillet7_piece_9 = split(fillet7_piece_9, bisect_by=Plane(origin=(-6.777174101, 0.928260431, 4.229410037), z_dir=(0.9191450300180579, -0.3939192985791677, 0)), keep=Keep.TOP, mode=Mode.PRIVATE)
    add(fillet7_piece_9)
    with BuildSketch(Plane(origin=(-3.175, 0, 6.5), x_dir=(1, 0, 0), z_dir=(0, 0, -1))) as fillet7_piece_10a_section:
        with BuildLine():
            CenterArc((FILLET7_R, -FILLET7_R), FILLET7_R, 90, 90)
            Line((0, -FILLET7_R), (0, 0))
            Line((0, 0), (FILLET7_R, 0))
        make_face()
    fillet7_piece_10a = extrude(amount=2.9125, mode=Mode.PRIVATE)
    fillet7_piece_10a = split(fillet7_piece_10a, bisect_by=Plane(origin=(-2.948604886, 0.226395114, 5), z_dir=(0, 0, -1)), keep=Keep.TOP, mode=Mode.PRIVATE)
    fillet7_piece_10a = split(fillet7_piece_10a, bisect_by=Plane(origin=(-2.948604886, 0.226395114, 4), z_dir=(0, 0, 1)), keep=Keep.TOP, mode=Mode.PRIVATE)
    with BuildSketch(Plane(origin=(-9.675, 0, 4), x_dir=(0, 0, 1), z_dir=(1, 0, 0))) as fillet7_piece_10b_section:
        with BuildLine():
            CenterArc((FILLET7_R, -FILLET7_R), FILLET7_R, 90, 90)
            Line((0, -FILLET7_R), (0, 0))
            Line((0, 0), (FILLET7_R, 0))
        make_face()
    fillet7_piece_10b = extrude(amount=9, mode=Mode.PRIVATE)
    fillet7_piece_10b = split(fillet7_piece_10b, bisect_by=Plane(origin=(-3.175, 0.226395114, 4.226395114), z_dir=(1, 0, 0)), keep=Keep.TOP, mode=Mode.PRIVATE)
    fillet7_piece_10 = fillet7_piece_10a & fillet7_piece_10b
    add(fillet7_piece_10)
    with BuildSketch(Plane(origin=(-0.675, 0, -4), x_dir=(0, 0, -1), z_dir=(-1, 0, 0))) as fillet7_piece_11a_section:
        with BuildLine():
            CenterArc((FILLET7_R, -FILLET7_R), FILLET7_R, 90, 90)
            Line((0, -FILLET7_R), (0, 0))
            Line((0, 0), (FILLET7_R, 0))
        make_face()
    fillet7_piece_11a = extrude(amount=9, mode=Mode.PRIVATE)
    fillet7_piece_11a = split(fillet7_piece_11a, bisect_by=Plane(origin=(-3.175, 0.226395114, -4.226395114), z_dir=(1, 0, 0)), keep=Keep.TOP, mode=Mode.PRIVATE)
    with BuildSketch(Plane(origin=(-3.175, 0, -3.5875), x_dir=(1, 0, 0), z_dir=(0, 0, -1))) as fillet7_piece_11b_section:
        with BuildLine():
            CenterArc((FILLET7_R, -FILLET7_R), FILLET7_R, 90, 90)
            Line((0, -FILLET7_R), (0, 0))
            Line((0, 0), (FILLET7_R, 0))
        make_face()
    fillet7_piece_11b = extrude(amount=2.9125, mode=Mode.PRIVATE)
    fillet7_piece_11b = split(fillet7_piece_11b, bisect_by=Plane(origin=(-2.948604886, 0.226395114, -5), z_dir=(0, 0, 1)), keep=Keep.TOP, mode=Mode.PRIVATE)
    fillet7_piece_11b = split(fillet7_piece_11b, bisect_by=Plane(origin=(-2.948604886, 0.226395114, -4), z_dir=(0, 0, -1)), keep=Keep.TOP, mode=Mode.PRIVATE)
    fillet7_piece_11 = fillet7_piece_11a & fillet7_piece_11b
    add(fillet7_piece_11)
    with BuildSketch(Plane(origin=(-7.175, 0, -5.648490395), x_dir=(-1, 0, 0), z_dir=(0, 0, 1))) as fillet7_piece_12a_section:
        with BuildLine():
            CenterArc((FILLET7_R * 0.659396157981, -FILLET7_R), FILLET7_R, 90, 66.801409486)
            Line((-FILLET7_R * 0.259748872037, -FILLET7_R * 0.606080701421), (0, 0))
            Line((0, 0), (FILLET7_R * 0.659396157981, 0))
        make_face()
    fillet7_piece_12a = extrude(amount=9.648490395, mode=Mode.PRIVATE)
    fillet7_piece_12a = split(fillet7_piece_12a, bisect_by=Plane(origin=(-7.262287498, 0.132374897, -5), z_dir=(0, 0, 1)), keep=Keep.TOP, mode=Mode.PRIVATE)
    fillet7_piece_12a = split(fillet7_piece_12a, bisect_by=Plane(origin=(-7.262287498, 0.132374897, -4), z_dir=(0, 0, -1)), keep=Keep.TOP, mode=Mode.PRIVATE)
    with BuildSketch(Plane(origin=(-3.175, 0, -4), x_dir=(0, 0, -1), z_dir=(-1, 0, 0))) as fillet7_piece_12b_section:
        with BuildLine():
            CenterArc((FILLET7_R, -FILLET7_R), FILLET7_R, 90, 90)
            Line((0, -FILLET7_R), (0, 0))
            Line((0, 0), (FILLET7_R, 0))
        make_face()
    fillet7_piece_12b = extrude(amount=6.5, mode=Mode.PRIVATE)
    fillet7_piece_12b = split(fillet7_piece_12b, bisect_by=Plane(origin=(-7.276434947, -0.236681543, -4.221864101), z_dir=(-0.9191450300180579, 0.3939192985791677, 0)), keep=Keep.TOP, mode=Mode.PRIVATE)
    fillet7_piece_12 = fillet7_piece_12a & fillet7_piece_12b
    add(fillet7_piece_12)
    with BuildSketch(Plane(origin=(-9.675, 0, 4), x_dir=(0, 0, 1), z_dir=(1, 0, 0))) as fillet7_piece_13a_section:
        with BuildLine():
            CenterArc((FILLET7_R, -FILLET7_R), FILLET7_R, 90, 90)
            Line((0, -FILLET7_R), (0, 0))
            Line((0, 0), (FILLET7_R, 0))
        make_face()
    fillet7_piece_13a = extrude(amount=6.5, mode=Mode.PRIVATE)
    fillet7_piece_13a = split(fillet7_piece_13a, bisect_by=Plane(origin=(-7.276434947, -0.236681543, 4.221864101), z_dir=(-0.9191450300180579, 0.3939192985791677, 0)), keep=Keep.TOP, mode=Mode.PRIVATE)
    with BuildSketch(Plane(origin=(-7.175, 0, -4), x_dir=(-1, 0, 0), z_dir=(0, 0, 1))) as fillet7_piece_13b_section:
        with BuildLine():
            CenterArc((FILLET7_R * 0.659396157981, -FILLET7_R), FILLET7_R, 90, 66.801409486)
            Line((-FILLET7_R * 0.259748872037, -FILLET7_R * 0.606080701421), (0, 0))
            Line((0, 0), (FILLET7_R * 0.659396157981, 0))
        make_face()
    fillet7_piece_13b = extrude(amount=9.648490395, mode=Mode.PRIVATE)
    fillet7_piece_13b = split(fillet7_piece_13b, bisect_by=Plane(origin=(-7.262287498, 0.132374897, 5), z_dir=(0, 0, -1)), keep=Keep.TOP, mode=Mode.PRIVATE)
    fillet7_piece_13b = split(fillet7_piece_13b, bisect_by=Plane(origin=(-7.262287498, 0.132374897, 4), z_dir=(0, 0, 1)), keep=Keep.TOP, mode=Mode.PRIVATE)
    fillet7_piece_13 = fillet7_piece_13a & fillet7_piece_13b
    add(fillet7_piece_13)


solid = part.part
